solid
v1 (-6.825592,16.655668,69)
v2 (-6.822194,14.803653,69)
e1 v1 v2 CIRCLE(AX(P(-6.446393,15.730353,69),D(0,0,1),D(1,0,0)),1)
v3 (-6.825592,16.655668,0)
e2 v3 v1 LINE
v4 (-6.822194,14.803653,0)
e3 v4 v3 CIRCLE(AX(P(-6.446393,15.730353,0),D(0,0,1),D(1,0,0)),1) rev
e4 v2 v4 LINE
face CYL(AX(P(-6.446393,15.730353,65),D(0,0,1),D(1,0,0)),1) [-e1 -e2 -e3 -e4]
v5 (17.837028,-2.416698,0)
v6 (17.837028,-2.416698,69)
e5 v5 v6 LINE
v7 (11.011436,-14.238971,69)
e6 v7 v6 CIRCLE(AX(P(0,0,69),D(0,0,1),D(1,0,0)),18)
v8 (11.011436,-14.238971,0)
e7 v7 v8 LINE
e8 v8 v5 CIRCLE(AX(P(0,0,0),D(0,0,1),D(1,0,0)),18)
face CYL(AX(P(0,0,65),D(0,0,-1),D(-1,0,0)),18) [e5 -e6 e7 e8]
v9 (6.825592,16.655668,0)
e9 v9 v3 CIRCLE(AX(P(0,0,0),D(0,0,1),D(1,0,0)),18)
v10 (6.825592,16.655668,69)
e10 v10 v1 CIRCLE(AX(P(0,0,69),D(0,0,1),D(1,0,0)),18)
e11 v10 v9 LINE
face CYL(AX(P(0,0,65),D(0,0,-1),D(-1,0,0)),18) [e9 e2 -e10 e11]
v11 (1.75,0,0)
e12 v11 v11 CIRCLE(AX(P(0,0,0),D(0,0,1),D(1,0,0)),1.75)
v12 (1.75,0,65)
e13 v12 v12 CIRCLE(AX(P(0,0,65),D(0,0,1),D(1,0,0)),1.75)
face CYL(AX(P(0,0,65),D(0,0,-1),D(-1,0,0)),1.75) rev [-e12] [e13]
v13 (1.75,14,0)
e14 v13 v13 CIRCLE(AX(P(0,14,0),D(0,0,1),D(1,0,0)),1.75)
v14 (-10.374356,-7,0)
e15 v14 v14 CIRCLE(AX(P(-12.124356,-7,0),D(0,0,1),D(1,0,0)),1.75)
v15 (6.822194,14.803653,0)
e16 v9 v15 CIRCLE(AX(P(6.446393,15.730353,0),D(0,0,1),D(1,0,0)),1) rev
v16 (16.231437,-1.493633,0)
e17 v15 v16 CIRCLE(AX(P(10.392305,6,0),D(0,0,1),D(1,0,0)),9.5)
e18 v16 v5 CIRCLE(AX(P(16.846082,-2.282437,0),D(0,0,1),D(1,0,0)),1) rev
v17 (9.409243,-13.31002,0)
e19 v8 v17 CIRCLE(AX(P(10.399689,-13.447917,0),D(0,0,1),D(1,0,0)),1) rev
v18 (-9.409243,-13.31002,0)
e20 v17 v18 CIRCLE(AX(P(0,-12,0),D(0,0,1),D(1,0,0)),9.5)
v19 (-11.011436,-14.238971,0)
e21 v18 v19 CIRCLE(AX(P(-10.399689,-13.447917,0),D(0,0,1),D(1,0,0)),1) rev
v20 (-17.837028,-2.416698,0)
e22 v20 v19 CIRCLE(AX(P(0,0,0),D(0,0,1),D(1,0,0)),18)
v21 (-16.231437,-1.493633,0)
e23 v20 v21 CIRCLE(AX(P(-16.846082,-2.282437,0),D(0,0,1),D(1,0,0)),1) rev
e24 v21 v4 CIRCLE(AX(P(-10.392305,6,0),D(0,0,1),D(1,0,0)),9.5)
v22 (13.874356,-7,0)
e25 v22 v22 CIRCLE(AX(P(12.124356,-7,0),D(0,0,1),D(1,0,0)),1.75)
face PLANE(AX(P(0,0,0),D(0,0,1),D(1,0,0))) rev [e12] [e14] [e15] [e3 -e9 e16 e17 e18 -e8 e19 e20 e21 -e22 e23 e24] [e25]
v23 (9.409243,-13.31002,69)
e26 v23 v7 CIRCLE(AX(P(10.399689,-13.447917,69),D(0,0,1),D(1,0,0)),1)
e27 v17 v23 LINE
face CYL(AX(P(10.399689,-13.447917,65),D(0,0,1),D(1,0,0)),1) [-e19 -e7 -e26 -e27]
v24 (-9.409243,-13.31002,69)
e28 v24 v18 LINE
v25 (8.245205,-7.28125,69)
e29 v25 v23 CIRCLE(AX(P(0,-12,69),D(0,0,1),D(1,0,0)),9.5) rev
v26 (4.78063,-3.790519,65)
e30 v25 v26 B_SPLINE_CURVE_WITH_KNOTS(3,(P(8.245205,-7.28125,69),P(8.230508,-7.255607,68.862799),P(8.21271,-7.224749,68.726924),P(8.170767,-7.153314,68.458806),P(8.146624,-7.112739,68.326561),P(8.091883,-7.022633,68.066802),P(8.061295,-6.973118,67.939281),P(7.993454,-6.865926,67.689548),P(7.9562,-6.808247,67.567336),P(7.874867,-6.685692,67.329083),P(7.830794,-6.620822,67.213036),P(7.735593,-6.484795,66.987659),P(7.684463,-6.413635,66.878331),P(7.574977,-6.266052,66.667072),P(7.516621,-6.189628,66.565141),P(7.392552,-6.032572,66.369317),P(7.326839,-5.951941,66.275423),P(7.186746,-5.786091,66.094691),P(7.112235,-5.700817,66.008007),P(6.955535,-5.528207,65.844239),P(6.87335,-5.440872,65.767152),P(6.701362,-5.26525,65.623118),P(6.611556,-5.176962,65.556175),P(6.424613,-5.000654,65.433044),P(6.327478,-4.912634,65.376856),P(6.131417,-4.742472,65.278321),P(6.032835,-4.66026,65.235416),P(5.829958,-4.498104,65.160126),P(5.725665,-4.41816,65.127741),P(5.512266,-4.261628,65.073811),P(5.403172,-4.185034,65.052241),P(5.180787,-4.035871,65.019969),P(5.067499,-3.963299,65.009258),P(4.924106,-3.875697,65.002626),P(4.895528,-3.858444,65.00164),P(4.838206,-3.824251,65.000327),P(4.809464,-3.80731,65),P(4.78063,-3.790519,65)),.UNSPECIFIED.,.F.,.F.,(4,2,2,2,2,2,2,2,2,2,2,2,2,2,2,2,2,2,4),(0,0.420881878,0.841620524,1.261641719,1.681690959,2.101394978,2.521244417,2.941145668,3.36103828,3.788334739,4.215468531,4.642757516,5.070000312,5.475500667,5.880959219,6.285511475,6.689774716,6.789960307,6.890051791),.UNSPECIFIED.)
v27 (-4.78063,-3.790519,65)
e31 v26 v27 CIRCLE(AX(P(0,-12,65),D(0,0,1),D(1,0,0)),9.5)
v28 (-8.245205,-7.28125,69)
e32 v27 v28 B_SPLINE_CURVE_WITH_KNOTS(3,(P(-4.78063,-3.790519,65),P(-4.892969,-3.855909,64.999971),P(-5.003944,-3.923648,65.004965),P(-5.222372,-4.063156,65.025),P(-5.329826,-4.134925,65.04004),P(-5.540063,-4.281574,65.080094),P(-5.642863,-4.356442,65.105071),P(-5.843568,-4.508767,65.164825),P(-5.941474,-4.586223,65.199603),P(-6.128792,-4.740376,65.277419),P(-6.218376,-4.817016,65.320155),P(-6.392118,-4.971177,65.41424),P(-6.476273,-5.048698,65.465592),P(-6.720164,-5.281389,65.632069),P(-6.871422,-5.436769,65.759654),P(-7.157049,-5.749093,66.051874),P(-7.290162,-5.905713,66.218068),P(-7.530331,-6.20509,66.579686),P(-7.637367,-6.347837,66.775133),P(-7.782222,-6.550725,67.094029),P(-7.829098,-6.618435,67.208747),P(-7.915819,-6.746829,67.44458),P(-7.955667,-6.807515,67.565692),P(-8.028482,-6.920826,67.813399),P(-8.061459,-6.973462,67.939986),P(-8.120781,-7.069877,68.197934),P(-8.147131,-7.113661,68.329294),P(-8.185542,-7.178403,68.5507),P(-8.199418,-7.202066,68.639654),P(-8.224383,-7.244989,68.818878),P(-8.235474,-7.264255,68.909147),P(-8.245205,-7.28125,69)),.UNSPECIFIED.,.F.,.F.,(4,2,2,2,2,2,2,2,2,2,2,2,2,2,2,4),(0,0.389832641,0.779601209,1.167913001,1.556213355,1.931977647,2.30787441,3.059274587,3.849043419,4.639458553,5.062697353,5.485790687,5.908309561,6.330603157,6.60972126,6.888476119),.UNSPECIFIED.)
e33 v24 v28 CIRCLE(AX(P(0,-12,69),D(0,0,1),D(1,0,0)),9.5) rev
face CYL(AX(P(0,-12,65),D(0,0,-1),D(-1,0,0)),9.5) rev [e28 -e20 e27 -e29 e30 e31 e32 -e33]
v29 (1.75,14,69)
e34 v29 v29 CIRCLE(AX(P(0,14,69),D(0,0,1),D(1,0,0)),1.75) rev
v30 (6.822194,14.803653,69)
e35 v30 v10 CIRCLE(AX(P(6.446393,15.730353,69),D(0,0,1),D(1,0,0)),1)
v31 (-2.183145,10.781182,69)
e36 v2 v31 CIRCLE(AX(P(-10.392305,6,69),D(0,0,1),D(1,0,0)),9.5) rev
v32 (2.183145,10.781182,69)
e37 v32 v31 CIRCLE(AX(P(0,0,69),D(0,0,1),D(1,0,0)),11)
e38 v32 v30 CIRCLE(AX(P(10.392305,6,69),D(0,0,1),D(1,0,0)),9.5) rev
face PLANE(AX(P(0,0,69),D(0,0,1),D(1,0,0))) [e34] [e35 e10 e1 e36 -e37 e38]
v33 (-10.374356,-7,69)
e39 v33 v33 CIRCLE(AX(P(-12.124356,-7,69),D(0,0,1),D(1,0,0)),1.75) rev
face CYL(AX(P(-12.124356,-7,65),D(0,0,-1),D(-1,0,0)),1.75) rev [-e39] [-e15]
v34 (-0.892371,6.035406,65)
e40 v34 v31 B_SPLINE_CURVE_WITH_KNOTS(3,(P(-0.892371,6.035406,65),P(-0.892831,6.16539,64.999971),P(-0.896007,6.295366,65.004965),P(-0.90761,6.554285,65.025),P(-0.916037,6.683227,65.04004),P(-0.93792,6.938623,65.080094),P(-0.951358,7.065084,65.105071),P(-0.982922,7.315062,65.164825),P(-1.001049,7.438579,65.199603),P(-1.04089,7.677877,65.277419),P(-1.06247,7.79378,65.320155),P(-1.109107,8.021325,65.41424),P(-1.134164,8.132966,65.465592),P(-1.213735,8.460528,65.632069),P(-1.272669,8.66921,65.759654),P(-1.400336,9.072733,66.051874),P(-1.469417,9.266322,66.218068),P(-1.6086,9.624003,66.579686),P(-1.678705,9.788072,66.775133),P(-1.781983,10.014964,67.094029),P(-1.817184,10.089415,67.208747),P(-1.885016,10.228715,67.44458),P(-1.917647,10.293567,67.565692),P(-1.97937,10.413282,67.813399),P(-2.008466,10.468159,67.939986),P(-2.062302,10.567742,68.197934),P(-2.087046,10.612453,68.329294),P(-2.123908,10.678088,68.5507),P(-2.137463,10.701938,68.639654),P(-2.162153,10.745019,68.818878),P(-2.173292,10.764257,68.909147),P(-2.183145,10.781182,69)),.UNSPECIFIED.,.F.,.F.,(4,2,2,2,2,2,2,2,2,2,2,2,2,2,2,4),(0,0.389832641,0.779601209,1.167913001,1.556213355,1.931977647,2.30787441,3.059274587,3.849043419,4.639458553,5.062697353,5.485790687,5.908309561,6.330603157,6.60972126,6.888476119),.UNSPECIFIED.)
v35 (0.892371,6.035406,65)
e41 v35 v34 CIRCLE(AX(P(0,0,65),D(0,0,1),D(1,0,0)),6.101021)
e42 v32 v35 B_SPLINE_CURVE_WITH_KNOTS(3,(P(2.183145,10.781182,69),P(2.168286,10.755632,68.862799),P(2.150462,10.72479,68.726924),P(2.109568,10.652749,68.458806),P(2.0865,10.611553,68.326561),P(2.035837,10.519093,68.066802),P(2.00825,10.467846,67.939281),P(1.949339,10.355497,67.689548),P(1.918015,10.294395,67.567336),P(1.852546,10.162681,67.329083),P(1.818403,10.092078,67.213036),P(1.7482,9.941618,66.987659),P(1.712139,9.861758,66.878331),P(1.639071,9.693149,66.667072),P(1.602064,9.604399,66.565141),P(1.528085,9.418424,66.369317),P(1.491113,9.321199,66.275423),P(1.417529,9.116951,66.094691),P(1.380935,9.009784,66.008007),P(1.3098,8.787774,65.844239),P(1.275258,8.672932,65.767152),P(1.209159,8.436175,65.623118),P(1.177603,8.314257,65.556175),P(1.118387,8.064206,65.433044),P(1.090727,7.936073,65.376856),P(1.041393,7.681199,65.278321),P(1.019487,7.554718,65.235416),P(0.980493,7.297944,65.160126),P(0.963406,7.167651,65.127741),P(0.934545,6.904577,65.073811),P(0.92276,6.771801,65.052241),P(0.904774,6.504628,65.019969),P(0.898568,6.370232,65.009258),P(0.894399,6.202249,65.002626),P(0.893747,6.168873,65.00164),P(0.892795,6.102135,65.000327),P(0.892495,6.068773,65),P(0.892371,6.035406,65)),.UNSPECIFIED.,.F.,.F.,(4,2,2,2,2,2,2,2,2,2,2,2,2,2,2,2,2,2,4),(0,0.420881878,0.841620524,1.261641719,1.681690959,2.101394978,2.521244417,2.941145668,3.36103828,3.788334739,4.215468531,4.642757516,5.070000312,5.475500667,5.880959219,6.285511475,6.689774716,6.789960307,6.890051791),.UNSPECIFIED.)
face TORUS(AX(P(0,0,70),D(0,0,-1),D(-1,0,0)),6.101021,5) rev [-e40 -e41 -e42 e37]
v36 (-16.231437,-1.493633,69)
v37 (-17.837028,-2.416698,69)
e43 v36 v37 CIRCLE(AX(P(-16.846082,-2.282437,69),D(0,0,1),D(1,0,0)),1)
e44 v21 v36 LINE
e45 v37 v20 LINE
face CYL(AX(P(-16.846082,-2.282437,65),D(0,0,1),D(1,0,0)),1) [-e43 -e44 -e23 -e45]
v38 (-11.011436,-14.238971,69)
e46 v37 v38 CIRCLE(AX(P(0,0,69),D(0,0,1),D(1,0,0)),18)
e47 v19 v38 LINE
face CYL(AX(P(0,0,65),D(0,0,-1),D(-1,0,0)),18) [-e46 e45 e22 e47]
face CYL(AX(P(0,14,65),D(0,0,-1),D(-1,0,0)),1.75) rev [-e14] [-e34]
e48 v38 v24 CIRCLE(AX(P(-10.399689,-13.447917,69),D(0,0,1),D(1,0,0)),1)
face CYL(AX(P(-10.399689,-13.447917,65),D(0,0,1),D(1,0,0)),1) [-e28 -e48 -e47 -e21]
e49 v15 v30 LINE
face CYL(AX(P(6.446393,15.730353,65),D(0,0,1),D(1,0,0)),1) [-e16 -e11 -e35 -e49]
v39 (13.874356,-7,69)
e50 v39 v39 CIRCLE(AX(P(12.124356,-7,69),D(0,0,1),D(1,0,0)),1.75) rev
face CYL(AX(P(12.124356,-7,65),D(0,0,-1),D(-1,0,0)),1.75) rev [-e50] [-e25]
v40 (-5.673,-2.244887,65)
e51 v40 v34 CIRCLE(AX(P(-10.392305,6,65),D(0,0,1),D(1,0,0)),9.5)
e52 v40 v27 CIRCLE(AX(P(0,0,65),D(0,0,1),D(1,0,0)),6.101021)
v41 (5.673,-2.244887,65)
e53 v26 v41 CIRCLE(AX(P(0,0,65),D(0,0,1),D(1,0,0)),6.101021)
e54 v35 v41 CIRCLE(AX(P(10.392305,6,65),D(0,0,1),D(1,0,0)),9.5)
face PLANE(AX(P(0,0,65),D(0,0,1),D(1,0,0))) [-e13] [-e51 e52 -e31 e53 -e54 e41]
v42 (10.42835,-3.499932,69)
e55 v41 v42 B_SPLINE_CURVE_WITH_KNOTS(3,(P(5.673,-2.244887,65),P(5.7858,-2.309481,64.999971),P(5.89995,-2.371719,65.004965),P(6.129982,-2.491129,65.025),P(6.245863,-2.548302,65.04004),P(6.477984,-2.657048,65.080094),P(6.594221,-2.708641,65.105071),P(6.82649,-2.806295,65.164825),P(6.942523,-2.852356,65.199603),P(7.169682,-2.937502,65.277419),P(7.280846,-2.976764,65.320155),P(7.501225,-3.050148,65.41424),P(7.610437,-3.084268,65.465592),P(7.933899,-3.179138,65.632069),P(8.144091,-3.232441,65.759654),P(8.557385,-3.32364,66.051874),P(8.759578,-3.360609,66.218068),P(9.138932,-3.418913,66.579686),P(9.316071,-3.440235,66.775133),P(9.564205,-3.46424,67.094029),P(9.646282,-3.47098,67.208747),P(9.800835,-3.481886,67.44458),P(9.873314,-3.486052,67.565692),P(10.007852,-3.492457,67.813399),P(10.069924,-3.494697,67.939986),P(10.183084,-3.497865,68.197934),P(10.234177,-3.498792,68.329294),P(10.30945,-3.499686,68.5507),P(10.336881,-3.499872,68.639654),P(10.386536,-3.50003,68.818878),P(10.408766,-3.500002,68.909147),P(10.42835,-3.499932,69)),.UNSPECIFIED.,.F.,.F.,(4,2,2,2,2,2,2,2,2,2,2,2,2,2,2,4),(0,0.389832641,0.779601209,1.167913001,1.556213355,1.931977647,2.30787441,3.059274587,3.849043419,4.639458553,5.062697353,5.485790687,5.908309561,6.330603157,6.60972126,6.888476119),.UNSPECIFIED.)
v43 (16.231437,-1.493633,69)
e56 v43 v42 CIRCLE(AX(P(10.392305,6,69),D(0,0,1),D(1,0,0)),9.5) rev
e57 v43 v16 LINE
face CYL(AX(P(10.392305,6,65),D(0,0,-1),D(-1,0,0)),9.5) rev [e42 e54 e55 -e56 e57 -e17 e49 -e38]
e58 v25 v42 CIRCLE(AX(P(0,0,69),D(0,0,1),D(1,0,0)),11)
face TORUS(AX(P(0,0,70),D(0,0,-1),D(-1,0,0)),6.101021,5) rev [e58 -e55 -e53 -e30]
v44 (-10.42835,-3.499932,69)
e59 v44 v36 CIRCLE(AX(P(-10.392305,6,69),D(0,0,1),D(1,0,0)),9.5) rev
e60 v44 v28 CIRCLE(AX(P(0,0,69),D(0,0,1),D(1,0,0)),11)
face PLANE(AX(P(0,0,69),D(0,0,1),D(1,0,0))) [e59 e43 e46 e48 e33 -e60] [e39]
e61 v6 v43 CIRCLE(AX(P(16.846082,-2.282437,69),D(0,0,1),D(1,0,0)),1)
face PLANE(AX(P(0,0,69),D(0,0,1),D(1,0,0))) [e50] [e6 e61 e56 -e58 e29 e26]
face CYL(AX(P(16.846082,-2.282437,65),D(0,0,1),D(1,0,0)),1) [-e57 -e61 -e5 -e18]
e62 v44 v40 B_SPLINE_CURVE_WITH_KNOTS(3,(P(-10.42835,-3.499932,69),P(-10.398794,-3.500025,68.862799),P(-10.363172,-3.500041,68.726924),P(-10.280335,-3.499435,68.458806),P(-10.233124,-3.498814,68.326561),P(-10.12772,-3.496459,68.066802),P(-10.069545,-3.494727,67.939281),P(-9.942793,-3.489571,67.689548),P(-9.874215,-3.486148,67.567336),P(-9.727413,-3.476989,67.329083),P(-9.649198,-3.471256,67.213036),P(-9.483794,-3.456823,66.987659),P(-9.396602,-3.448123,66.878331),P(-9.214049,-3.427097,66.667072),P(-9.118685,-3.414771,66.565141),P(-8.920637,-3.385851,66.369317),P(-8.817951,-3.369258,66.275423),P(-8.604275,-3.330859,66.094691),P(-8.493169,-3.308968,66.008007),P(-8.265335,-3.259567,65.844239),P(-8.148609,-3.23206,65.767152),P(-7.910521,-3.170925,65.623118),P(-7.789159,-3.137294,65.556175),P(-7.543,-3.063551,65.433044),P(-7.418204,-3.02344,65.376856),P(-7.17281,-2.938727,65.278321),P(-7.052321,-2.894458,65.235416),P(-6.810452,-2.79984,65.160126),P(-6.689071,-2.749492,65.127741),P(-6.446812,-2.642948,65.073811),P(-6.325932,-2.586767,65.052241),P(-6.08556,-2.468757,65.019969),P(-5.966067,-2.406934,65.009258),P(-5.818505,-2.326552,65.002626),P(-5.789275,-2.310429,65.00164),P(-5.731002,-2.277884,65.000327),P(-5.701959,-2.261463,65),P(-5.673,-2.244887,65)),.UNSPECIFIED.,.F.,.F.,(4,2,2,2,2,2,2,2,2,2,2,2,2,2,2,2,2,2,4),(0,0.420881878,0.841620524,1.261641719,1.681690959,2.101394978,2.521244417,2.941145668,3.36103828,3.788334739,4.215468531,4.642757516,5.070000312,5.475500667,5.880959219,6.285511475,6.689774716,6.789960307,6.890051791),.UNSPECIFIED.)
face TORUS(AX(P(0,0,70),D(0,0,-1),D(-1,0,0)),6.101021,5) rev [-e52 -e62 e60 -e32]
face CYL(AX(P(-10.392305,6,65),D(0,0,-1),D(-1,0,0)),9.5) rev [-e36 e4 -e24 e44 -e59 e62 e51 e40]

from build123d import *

# Parameters (mm, degrees)
SKETCH_1_R      = 1.75
EXTRUDE_1_DEPTH = 65
FILLET_1_R      = 1
SKETCH_2_R      = 1.75
EXTRUDE_2_DEPTH = 4
FILLET_2_R      = 5


with BuildPart() as part:
    # Эскиз1 → Бобышка-Вытянуть1 (new body)
    with BuildSketch(Plane.XY):
        with BuildLine():
            ThreePointArc((8.733013025, -15.739583333), (15.511193288, -9.132517877), (18, 0))
            ThreePointArc((18, 0), (17.999346369, 0.153395838), (17.997385524, 0.306780536))
            ThreePointArc((17.997385524, 0.306780536), (2.165063509, 1.25), (9.264372499, 15.432802798))
            ThreePointArc((9.264372499, 15.432802798), (0, 18), (-9.264372499, 15.432802798))
            ThreePointArc((-9.264372499, 15.432802798), (-3.287188474, 12.30613363), (-0.892304845, 6))
            ThreePointArc((-0.892304845, 6), (-7.392160386, -3.013830108), (-17.997385524, 0.306780536))
            ThreePointArc((-17.997385524, 0.306780536), (-15.588457268, -9), (-8.733013025, -15.739583333))
            ThreePointArc((-8.733013025, -15.739583333), (-1.908713738, -2.693721911), (9.5, -12))
            ThreePointArc((9.5, -12), (9.306278089, -13.908713738), (8.733013025, -15.739583333))
        make_face()
        with Locations((-12.124355653, -7)):
            Circle(SKETCH_1_R, mode=Mode.SUBTRACT)
        with Locations((12.124355653, -7)):
            Circle(SKETCH_1_R, mode=Mode.SUBTRACT)
        Circle(SKETCH_1_R, mode=Mode.SUBTRACT)
        with Locations((0, 14)):
            Circle(SKETCH_1_R, mode=Mode.SUBTRACT)
    extrude(amount=EXTRUDE_1_DEPTH)

    # Скругление1
    fillet_1_edges = [part.edges().sort_by_distance(p)[0] for p in [
        (17.997385524, 0.306780536, 32.5),
        (8.733013025, -15.739583333, 32.5),
        (-8.733013025, -15.739583333, 32.5),
        (-17.997385524, 0.306780536, 32.5),
        (-9.264372499, 15.432802798, 32.5),
        (9.264372499, 15.432802798, 32.5),
    ]]
    fillet(fillet_1_edges, radius=FILLET_1_R)

    # Эскиз2 → Бобышка-Вытянуть2 (add)
    # profile 1 of 3: a face of its own
    with BuildSketch(Plane.XY.offset(65)):
        with BuildLine():
            ThreePointArc((6.822193962, 14.803653121), (7.446391133, 15.728518462), (6.825592394, 16.655668359))
            ThreePointArc((6.825592394, 16.655668359), (0, 18), (-6.825592394, 16.655668359))
            ThreePointArc((-6.825592394, 16.655668359), (-7.446391133, 15.728518462), (-6.822193962, 14.803653121))
            ThreePointArc((-6.822193962, 14.803653121), (-4.168730882, 13.177543251), (-2.183145185, 10.781181619))
            ThreePointArc((-2.183145185, 10.781181619), (0, 11), (2.183145185, 10.781181619))
            ThreePointArc((2.183145185, 10.781181619), (4.168730882, 13.177543251), (6.822193962, 14.803653121))
        make_face()
        with Locations((0, 14)):
            Circle(SKETCH_2_R, mode=Mode.SUBTRACT)
    # profile 2 of 3: a face of its own
    with BuildSketch(Plane.XY.offset(65)):
        with BuildLine():
            ThreePointArc((17.837028113, -2.41669777), (17.344492118, -1.415495343), (16.231436653, -1.49363328))
            ThreePointArc((16.231436653, -1.49363328), (13.496452656, -2.97854478), (10.428349757, -3.499931619))
            ThreePointArc((10.428349757, -3.499931619), (9.526279442, -5.5), (8.245204572, -7.28125))
            ThreePointArc((8.245204572, -7.28125), (9.1809434, -9.558631883), (9.5, -12))
            ThreePointArc((9.5, -12), (9.477283513, -12.656579941), (9.409242691, -13.310019841))
            ThreePointArc((9.409242691, -13.310019841), (9.898100985, -14.313023118), (11.011435719, -14.238970588))
            ThreePointArc((11.011435719, -14.238970588), (15.588457268, -9), (17.837028113, -2.41669777))
        make_face()
        with Locations((12.124355653, -7)):
            Circle(SKETCH_2_R, mode=Mode.SUBTRACT)
    # profile 3 of 3: a face of its own
    with BuildSketch(Plane.XY.offset(65)):
        with BuildLine():
            ThreePointArc((-10.428349757, -3.499931619), (-13.496452656, -2.97854478), (-16.231436653, -1.49363328))
            ThreePointArc((-16.231436653, -1.49363328), (-17.344492118, -1.415495343), (-17.837028113, -2.41669777))
            ThreePointArc((-17.837028113, -2.41669777), (-15.588457268, -9), (-11.011435719, -14.238970588))
            ThreePointArc((-11.011435719, -14.238970588), (-9.898100985, -14.313023118), (-9.409242691, -13.310019841))
            ThreePointArc((-9.409242691, -13.310019841), (-9.327721774, -10.198998471), (-8.245204572, -7.28125))
            ThreePointArc((-8.245204572, -7.28125), (-9.526279442, -5.5), (-10.428349757, -3.499931619))
        make_face()
        with Locations((-12.124355653, -7)):
            Circle(SKETCH_2_R, mode=Mode.SUBTRACT)
    extrude(amount=EXTRUDE_2_DEPTH)

    # Скругление2
    # the kernel refuses this fillet: 5 mm, written as the material it adds along each edge
    with BuildSketch(Plane(origin=(0, 0, 65), x_dir=(0.26290330045081145, -0.9648221880803066, 0), z_dir=(0.9648221880803066, 0.26290330045081145, 0))) as fillet_2_piece_1_section:
        with BuildLine():
            CenterArc((6.101020514, -5), FILLET_2_R, 11.536959033, 78.463040967)
            Line((6.101020514, 0), (6.101020514, 0.1))
            Line((6.101020514, 0.1), (11, 0.1))
            Line((11, 0.1), (11.1, 0))
            ThreePointArc((11.1, 0), (11.1, -2), (11.09797959, -3.98))
            Line((11.09797959, -3.98), (11, -4))
        make_face()
    fillet_2_piece_1 = revolve(axis=Axis((0, 0, 65), (0, 0, -1)), revolution_arc=150.484807428, mode=Mode.PRIVATE)
    fillet_2_piece_1 = fillet_2_piece_1 - Plane(origin=(-10.392304845, 6, 66.122013519), x_dir=(0.1187297206541081, 0.9929266102957446, 0), z_dir=(0, 0, -1)) * Cylinder(9.5, 45, mode=Mode.PRIVATE)
    fillet_2_piece_1 = fillet_2_piece_1 - Plane(origin=(0, -12, 66.122013519), x_dir=(-0.9192645289367253, -0.3936403508772196, 0), z_dir=(0, 0, -1)) * Cylinder(9.5, 45, mode=Mode.PRIVATE)
    add(fillet_2_piece_1)
    with BuildSketch(Plane(origin=(0, 0, 65), x_dir=(0.7041088747870229, 0.7100920309693333, 0), z_dir=(-0.7100920309693333, 0.7041088747870229, 0))) as fillet_2_piece_2_section:
        with BuildLine():
            CenterArc((6.101020514, -5), FILLET_2_R, 11.536959033, 78.463040967)
            Line((11, -4), (11.09797959, -3.98))
            ThreePointArc((11.09797959, -3.98), (11.1, -2), (11.1, 0))
            Line((11.1, 0), (11, 0.1))
            Line((11, 0.1), (6.101020514, 0.1))
            Line((6.101020514, 0.1), (6.101020514, 0))
        make_face()
    fillet_2_piece_2 = revolve(axis=Axis((0, 0, 65), (0, 0, -1)), revolution_arc=150.484807428, mode=Mode.PRIVATE)
    fillet_2_piece_2 = fillet_2_piece_2 - Plane(origin=(10.392304845, 6, 66.122013516), x_dir=(0.8005348082826462, -0.5992862594185411, 0), z_dir=(0, 0, -1)) * Cylinder(9.5, 45, mode=Mode.PRIVATE)
    fillet_2_piece_2 = fillet_2_piece_2 - Plane(origin=(0, -12, 66.122013516), x_dir=(-0.9192645289367253, -0.3936403508772196, 0), z_dir=(0, 0, -1)) * Cylinder(9.5, 45, mode=Mode.PRIVATE)
    add(fillet_2_piece_2)
    with BuildSketch(Plane(origin=(0, 0, 65), x_dir=(-0.9670121752378409, 0.2547301571109701, 0), z_dir=(-0.2547301571109701, -0.9670121752378409, 0))) as fillet_2_piece_3_section:
        with BuildLine():
            CenterArc((6.101020514, -5), FILLET_2_R, 11.536959033, 78.463040967)
            Line((6.101020514, 0), (6.101020514, 0.1))
            Line((6.101020514, 0.1), (11, 0.1))
            Line((11, 0.1), (11.1, 0))
            ThreePointArc((11.1, 0), (11.1, -2), (11.09797959, -3.98))
            Line((11.09797959, -3.98), (11, -4))
        make_face()
    fillet_2_piece_3 = revolve(axis=Axis((0, 0, 65), (0, 0, -1)), revolution_arc=150.484807428, mode=Mode.PRIVATE)
    fillet_2_piece_3 = fillet_2_piece_3 - Plane(origin=(10.392304845, 6, 66.122013519), x_dir=(0.8005348082826462, -0.5992862594185411, 0), z_dir=(0, 0, -1)) * Cylinder(9.5, 45, mode=Mode.PRIVATE)
    fillet_2_piece_3 = fillet_2_piece_3 - Plane(origin=(-10.392304845, 6, 66.122013519), x_dir=(0.1187297206541081, 0.9929266102957446, 0), z_dir=(0, 0, -1)) * Cylinder(9.5, 45, mode=Mode.PRIVATE)
    add(fillet_2_piece_3)


solid = part.part
